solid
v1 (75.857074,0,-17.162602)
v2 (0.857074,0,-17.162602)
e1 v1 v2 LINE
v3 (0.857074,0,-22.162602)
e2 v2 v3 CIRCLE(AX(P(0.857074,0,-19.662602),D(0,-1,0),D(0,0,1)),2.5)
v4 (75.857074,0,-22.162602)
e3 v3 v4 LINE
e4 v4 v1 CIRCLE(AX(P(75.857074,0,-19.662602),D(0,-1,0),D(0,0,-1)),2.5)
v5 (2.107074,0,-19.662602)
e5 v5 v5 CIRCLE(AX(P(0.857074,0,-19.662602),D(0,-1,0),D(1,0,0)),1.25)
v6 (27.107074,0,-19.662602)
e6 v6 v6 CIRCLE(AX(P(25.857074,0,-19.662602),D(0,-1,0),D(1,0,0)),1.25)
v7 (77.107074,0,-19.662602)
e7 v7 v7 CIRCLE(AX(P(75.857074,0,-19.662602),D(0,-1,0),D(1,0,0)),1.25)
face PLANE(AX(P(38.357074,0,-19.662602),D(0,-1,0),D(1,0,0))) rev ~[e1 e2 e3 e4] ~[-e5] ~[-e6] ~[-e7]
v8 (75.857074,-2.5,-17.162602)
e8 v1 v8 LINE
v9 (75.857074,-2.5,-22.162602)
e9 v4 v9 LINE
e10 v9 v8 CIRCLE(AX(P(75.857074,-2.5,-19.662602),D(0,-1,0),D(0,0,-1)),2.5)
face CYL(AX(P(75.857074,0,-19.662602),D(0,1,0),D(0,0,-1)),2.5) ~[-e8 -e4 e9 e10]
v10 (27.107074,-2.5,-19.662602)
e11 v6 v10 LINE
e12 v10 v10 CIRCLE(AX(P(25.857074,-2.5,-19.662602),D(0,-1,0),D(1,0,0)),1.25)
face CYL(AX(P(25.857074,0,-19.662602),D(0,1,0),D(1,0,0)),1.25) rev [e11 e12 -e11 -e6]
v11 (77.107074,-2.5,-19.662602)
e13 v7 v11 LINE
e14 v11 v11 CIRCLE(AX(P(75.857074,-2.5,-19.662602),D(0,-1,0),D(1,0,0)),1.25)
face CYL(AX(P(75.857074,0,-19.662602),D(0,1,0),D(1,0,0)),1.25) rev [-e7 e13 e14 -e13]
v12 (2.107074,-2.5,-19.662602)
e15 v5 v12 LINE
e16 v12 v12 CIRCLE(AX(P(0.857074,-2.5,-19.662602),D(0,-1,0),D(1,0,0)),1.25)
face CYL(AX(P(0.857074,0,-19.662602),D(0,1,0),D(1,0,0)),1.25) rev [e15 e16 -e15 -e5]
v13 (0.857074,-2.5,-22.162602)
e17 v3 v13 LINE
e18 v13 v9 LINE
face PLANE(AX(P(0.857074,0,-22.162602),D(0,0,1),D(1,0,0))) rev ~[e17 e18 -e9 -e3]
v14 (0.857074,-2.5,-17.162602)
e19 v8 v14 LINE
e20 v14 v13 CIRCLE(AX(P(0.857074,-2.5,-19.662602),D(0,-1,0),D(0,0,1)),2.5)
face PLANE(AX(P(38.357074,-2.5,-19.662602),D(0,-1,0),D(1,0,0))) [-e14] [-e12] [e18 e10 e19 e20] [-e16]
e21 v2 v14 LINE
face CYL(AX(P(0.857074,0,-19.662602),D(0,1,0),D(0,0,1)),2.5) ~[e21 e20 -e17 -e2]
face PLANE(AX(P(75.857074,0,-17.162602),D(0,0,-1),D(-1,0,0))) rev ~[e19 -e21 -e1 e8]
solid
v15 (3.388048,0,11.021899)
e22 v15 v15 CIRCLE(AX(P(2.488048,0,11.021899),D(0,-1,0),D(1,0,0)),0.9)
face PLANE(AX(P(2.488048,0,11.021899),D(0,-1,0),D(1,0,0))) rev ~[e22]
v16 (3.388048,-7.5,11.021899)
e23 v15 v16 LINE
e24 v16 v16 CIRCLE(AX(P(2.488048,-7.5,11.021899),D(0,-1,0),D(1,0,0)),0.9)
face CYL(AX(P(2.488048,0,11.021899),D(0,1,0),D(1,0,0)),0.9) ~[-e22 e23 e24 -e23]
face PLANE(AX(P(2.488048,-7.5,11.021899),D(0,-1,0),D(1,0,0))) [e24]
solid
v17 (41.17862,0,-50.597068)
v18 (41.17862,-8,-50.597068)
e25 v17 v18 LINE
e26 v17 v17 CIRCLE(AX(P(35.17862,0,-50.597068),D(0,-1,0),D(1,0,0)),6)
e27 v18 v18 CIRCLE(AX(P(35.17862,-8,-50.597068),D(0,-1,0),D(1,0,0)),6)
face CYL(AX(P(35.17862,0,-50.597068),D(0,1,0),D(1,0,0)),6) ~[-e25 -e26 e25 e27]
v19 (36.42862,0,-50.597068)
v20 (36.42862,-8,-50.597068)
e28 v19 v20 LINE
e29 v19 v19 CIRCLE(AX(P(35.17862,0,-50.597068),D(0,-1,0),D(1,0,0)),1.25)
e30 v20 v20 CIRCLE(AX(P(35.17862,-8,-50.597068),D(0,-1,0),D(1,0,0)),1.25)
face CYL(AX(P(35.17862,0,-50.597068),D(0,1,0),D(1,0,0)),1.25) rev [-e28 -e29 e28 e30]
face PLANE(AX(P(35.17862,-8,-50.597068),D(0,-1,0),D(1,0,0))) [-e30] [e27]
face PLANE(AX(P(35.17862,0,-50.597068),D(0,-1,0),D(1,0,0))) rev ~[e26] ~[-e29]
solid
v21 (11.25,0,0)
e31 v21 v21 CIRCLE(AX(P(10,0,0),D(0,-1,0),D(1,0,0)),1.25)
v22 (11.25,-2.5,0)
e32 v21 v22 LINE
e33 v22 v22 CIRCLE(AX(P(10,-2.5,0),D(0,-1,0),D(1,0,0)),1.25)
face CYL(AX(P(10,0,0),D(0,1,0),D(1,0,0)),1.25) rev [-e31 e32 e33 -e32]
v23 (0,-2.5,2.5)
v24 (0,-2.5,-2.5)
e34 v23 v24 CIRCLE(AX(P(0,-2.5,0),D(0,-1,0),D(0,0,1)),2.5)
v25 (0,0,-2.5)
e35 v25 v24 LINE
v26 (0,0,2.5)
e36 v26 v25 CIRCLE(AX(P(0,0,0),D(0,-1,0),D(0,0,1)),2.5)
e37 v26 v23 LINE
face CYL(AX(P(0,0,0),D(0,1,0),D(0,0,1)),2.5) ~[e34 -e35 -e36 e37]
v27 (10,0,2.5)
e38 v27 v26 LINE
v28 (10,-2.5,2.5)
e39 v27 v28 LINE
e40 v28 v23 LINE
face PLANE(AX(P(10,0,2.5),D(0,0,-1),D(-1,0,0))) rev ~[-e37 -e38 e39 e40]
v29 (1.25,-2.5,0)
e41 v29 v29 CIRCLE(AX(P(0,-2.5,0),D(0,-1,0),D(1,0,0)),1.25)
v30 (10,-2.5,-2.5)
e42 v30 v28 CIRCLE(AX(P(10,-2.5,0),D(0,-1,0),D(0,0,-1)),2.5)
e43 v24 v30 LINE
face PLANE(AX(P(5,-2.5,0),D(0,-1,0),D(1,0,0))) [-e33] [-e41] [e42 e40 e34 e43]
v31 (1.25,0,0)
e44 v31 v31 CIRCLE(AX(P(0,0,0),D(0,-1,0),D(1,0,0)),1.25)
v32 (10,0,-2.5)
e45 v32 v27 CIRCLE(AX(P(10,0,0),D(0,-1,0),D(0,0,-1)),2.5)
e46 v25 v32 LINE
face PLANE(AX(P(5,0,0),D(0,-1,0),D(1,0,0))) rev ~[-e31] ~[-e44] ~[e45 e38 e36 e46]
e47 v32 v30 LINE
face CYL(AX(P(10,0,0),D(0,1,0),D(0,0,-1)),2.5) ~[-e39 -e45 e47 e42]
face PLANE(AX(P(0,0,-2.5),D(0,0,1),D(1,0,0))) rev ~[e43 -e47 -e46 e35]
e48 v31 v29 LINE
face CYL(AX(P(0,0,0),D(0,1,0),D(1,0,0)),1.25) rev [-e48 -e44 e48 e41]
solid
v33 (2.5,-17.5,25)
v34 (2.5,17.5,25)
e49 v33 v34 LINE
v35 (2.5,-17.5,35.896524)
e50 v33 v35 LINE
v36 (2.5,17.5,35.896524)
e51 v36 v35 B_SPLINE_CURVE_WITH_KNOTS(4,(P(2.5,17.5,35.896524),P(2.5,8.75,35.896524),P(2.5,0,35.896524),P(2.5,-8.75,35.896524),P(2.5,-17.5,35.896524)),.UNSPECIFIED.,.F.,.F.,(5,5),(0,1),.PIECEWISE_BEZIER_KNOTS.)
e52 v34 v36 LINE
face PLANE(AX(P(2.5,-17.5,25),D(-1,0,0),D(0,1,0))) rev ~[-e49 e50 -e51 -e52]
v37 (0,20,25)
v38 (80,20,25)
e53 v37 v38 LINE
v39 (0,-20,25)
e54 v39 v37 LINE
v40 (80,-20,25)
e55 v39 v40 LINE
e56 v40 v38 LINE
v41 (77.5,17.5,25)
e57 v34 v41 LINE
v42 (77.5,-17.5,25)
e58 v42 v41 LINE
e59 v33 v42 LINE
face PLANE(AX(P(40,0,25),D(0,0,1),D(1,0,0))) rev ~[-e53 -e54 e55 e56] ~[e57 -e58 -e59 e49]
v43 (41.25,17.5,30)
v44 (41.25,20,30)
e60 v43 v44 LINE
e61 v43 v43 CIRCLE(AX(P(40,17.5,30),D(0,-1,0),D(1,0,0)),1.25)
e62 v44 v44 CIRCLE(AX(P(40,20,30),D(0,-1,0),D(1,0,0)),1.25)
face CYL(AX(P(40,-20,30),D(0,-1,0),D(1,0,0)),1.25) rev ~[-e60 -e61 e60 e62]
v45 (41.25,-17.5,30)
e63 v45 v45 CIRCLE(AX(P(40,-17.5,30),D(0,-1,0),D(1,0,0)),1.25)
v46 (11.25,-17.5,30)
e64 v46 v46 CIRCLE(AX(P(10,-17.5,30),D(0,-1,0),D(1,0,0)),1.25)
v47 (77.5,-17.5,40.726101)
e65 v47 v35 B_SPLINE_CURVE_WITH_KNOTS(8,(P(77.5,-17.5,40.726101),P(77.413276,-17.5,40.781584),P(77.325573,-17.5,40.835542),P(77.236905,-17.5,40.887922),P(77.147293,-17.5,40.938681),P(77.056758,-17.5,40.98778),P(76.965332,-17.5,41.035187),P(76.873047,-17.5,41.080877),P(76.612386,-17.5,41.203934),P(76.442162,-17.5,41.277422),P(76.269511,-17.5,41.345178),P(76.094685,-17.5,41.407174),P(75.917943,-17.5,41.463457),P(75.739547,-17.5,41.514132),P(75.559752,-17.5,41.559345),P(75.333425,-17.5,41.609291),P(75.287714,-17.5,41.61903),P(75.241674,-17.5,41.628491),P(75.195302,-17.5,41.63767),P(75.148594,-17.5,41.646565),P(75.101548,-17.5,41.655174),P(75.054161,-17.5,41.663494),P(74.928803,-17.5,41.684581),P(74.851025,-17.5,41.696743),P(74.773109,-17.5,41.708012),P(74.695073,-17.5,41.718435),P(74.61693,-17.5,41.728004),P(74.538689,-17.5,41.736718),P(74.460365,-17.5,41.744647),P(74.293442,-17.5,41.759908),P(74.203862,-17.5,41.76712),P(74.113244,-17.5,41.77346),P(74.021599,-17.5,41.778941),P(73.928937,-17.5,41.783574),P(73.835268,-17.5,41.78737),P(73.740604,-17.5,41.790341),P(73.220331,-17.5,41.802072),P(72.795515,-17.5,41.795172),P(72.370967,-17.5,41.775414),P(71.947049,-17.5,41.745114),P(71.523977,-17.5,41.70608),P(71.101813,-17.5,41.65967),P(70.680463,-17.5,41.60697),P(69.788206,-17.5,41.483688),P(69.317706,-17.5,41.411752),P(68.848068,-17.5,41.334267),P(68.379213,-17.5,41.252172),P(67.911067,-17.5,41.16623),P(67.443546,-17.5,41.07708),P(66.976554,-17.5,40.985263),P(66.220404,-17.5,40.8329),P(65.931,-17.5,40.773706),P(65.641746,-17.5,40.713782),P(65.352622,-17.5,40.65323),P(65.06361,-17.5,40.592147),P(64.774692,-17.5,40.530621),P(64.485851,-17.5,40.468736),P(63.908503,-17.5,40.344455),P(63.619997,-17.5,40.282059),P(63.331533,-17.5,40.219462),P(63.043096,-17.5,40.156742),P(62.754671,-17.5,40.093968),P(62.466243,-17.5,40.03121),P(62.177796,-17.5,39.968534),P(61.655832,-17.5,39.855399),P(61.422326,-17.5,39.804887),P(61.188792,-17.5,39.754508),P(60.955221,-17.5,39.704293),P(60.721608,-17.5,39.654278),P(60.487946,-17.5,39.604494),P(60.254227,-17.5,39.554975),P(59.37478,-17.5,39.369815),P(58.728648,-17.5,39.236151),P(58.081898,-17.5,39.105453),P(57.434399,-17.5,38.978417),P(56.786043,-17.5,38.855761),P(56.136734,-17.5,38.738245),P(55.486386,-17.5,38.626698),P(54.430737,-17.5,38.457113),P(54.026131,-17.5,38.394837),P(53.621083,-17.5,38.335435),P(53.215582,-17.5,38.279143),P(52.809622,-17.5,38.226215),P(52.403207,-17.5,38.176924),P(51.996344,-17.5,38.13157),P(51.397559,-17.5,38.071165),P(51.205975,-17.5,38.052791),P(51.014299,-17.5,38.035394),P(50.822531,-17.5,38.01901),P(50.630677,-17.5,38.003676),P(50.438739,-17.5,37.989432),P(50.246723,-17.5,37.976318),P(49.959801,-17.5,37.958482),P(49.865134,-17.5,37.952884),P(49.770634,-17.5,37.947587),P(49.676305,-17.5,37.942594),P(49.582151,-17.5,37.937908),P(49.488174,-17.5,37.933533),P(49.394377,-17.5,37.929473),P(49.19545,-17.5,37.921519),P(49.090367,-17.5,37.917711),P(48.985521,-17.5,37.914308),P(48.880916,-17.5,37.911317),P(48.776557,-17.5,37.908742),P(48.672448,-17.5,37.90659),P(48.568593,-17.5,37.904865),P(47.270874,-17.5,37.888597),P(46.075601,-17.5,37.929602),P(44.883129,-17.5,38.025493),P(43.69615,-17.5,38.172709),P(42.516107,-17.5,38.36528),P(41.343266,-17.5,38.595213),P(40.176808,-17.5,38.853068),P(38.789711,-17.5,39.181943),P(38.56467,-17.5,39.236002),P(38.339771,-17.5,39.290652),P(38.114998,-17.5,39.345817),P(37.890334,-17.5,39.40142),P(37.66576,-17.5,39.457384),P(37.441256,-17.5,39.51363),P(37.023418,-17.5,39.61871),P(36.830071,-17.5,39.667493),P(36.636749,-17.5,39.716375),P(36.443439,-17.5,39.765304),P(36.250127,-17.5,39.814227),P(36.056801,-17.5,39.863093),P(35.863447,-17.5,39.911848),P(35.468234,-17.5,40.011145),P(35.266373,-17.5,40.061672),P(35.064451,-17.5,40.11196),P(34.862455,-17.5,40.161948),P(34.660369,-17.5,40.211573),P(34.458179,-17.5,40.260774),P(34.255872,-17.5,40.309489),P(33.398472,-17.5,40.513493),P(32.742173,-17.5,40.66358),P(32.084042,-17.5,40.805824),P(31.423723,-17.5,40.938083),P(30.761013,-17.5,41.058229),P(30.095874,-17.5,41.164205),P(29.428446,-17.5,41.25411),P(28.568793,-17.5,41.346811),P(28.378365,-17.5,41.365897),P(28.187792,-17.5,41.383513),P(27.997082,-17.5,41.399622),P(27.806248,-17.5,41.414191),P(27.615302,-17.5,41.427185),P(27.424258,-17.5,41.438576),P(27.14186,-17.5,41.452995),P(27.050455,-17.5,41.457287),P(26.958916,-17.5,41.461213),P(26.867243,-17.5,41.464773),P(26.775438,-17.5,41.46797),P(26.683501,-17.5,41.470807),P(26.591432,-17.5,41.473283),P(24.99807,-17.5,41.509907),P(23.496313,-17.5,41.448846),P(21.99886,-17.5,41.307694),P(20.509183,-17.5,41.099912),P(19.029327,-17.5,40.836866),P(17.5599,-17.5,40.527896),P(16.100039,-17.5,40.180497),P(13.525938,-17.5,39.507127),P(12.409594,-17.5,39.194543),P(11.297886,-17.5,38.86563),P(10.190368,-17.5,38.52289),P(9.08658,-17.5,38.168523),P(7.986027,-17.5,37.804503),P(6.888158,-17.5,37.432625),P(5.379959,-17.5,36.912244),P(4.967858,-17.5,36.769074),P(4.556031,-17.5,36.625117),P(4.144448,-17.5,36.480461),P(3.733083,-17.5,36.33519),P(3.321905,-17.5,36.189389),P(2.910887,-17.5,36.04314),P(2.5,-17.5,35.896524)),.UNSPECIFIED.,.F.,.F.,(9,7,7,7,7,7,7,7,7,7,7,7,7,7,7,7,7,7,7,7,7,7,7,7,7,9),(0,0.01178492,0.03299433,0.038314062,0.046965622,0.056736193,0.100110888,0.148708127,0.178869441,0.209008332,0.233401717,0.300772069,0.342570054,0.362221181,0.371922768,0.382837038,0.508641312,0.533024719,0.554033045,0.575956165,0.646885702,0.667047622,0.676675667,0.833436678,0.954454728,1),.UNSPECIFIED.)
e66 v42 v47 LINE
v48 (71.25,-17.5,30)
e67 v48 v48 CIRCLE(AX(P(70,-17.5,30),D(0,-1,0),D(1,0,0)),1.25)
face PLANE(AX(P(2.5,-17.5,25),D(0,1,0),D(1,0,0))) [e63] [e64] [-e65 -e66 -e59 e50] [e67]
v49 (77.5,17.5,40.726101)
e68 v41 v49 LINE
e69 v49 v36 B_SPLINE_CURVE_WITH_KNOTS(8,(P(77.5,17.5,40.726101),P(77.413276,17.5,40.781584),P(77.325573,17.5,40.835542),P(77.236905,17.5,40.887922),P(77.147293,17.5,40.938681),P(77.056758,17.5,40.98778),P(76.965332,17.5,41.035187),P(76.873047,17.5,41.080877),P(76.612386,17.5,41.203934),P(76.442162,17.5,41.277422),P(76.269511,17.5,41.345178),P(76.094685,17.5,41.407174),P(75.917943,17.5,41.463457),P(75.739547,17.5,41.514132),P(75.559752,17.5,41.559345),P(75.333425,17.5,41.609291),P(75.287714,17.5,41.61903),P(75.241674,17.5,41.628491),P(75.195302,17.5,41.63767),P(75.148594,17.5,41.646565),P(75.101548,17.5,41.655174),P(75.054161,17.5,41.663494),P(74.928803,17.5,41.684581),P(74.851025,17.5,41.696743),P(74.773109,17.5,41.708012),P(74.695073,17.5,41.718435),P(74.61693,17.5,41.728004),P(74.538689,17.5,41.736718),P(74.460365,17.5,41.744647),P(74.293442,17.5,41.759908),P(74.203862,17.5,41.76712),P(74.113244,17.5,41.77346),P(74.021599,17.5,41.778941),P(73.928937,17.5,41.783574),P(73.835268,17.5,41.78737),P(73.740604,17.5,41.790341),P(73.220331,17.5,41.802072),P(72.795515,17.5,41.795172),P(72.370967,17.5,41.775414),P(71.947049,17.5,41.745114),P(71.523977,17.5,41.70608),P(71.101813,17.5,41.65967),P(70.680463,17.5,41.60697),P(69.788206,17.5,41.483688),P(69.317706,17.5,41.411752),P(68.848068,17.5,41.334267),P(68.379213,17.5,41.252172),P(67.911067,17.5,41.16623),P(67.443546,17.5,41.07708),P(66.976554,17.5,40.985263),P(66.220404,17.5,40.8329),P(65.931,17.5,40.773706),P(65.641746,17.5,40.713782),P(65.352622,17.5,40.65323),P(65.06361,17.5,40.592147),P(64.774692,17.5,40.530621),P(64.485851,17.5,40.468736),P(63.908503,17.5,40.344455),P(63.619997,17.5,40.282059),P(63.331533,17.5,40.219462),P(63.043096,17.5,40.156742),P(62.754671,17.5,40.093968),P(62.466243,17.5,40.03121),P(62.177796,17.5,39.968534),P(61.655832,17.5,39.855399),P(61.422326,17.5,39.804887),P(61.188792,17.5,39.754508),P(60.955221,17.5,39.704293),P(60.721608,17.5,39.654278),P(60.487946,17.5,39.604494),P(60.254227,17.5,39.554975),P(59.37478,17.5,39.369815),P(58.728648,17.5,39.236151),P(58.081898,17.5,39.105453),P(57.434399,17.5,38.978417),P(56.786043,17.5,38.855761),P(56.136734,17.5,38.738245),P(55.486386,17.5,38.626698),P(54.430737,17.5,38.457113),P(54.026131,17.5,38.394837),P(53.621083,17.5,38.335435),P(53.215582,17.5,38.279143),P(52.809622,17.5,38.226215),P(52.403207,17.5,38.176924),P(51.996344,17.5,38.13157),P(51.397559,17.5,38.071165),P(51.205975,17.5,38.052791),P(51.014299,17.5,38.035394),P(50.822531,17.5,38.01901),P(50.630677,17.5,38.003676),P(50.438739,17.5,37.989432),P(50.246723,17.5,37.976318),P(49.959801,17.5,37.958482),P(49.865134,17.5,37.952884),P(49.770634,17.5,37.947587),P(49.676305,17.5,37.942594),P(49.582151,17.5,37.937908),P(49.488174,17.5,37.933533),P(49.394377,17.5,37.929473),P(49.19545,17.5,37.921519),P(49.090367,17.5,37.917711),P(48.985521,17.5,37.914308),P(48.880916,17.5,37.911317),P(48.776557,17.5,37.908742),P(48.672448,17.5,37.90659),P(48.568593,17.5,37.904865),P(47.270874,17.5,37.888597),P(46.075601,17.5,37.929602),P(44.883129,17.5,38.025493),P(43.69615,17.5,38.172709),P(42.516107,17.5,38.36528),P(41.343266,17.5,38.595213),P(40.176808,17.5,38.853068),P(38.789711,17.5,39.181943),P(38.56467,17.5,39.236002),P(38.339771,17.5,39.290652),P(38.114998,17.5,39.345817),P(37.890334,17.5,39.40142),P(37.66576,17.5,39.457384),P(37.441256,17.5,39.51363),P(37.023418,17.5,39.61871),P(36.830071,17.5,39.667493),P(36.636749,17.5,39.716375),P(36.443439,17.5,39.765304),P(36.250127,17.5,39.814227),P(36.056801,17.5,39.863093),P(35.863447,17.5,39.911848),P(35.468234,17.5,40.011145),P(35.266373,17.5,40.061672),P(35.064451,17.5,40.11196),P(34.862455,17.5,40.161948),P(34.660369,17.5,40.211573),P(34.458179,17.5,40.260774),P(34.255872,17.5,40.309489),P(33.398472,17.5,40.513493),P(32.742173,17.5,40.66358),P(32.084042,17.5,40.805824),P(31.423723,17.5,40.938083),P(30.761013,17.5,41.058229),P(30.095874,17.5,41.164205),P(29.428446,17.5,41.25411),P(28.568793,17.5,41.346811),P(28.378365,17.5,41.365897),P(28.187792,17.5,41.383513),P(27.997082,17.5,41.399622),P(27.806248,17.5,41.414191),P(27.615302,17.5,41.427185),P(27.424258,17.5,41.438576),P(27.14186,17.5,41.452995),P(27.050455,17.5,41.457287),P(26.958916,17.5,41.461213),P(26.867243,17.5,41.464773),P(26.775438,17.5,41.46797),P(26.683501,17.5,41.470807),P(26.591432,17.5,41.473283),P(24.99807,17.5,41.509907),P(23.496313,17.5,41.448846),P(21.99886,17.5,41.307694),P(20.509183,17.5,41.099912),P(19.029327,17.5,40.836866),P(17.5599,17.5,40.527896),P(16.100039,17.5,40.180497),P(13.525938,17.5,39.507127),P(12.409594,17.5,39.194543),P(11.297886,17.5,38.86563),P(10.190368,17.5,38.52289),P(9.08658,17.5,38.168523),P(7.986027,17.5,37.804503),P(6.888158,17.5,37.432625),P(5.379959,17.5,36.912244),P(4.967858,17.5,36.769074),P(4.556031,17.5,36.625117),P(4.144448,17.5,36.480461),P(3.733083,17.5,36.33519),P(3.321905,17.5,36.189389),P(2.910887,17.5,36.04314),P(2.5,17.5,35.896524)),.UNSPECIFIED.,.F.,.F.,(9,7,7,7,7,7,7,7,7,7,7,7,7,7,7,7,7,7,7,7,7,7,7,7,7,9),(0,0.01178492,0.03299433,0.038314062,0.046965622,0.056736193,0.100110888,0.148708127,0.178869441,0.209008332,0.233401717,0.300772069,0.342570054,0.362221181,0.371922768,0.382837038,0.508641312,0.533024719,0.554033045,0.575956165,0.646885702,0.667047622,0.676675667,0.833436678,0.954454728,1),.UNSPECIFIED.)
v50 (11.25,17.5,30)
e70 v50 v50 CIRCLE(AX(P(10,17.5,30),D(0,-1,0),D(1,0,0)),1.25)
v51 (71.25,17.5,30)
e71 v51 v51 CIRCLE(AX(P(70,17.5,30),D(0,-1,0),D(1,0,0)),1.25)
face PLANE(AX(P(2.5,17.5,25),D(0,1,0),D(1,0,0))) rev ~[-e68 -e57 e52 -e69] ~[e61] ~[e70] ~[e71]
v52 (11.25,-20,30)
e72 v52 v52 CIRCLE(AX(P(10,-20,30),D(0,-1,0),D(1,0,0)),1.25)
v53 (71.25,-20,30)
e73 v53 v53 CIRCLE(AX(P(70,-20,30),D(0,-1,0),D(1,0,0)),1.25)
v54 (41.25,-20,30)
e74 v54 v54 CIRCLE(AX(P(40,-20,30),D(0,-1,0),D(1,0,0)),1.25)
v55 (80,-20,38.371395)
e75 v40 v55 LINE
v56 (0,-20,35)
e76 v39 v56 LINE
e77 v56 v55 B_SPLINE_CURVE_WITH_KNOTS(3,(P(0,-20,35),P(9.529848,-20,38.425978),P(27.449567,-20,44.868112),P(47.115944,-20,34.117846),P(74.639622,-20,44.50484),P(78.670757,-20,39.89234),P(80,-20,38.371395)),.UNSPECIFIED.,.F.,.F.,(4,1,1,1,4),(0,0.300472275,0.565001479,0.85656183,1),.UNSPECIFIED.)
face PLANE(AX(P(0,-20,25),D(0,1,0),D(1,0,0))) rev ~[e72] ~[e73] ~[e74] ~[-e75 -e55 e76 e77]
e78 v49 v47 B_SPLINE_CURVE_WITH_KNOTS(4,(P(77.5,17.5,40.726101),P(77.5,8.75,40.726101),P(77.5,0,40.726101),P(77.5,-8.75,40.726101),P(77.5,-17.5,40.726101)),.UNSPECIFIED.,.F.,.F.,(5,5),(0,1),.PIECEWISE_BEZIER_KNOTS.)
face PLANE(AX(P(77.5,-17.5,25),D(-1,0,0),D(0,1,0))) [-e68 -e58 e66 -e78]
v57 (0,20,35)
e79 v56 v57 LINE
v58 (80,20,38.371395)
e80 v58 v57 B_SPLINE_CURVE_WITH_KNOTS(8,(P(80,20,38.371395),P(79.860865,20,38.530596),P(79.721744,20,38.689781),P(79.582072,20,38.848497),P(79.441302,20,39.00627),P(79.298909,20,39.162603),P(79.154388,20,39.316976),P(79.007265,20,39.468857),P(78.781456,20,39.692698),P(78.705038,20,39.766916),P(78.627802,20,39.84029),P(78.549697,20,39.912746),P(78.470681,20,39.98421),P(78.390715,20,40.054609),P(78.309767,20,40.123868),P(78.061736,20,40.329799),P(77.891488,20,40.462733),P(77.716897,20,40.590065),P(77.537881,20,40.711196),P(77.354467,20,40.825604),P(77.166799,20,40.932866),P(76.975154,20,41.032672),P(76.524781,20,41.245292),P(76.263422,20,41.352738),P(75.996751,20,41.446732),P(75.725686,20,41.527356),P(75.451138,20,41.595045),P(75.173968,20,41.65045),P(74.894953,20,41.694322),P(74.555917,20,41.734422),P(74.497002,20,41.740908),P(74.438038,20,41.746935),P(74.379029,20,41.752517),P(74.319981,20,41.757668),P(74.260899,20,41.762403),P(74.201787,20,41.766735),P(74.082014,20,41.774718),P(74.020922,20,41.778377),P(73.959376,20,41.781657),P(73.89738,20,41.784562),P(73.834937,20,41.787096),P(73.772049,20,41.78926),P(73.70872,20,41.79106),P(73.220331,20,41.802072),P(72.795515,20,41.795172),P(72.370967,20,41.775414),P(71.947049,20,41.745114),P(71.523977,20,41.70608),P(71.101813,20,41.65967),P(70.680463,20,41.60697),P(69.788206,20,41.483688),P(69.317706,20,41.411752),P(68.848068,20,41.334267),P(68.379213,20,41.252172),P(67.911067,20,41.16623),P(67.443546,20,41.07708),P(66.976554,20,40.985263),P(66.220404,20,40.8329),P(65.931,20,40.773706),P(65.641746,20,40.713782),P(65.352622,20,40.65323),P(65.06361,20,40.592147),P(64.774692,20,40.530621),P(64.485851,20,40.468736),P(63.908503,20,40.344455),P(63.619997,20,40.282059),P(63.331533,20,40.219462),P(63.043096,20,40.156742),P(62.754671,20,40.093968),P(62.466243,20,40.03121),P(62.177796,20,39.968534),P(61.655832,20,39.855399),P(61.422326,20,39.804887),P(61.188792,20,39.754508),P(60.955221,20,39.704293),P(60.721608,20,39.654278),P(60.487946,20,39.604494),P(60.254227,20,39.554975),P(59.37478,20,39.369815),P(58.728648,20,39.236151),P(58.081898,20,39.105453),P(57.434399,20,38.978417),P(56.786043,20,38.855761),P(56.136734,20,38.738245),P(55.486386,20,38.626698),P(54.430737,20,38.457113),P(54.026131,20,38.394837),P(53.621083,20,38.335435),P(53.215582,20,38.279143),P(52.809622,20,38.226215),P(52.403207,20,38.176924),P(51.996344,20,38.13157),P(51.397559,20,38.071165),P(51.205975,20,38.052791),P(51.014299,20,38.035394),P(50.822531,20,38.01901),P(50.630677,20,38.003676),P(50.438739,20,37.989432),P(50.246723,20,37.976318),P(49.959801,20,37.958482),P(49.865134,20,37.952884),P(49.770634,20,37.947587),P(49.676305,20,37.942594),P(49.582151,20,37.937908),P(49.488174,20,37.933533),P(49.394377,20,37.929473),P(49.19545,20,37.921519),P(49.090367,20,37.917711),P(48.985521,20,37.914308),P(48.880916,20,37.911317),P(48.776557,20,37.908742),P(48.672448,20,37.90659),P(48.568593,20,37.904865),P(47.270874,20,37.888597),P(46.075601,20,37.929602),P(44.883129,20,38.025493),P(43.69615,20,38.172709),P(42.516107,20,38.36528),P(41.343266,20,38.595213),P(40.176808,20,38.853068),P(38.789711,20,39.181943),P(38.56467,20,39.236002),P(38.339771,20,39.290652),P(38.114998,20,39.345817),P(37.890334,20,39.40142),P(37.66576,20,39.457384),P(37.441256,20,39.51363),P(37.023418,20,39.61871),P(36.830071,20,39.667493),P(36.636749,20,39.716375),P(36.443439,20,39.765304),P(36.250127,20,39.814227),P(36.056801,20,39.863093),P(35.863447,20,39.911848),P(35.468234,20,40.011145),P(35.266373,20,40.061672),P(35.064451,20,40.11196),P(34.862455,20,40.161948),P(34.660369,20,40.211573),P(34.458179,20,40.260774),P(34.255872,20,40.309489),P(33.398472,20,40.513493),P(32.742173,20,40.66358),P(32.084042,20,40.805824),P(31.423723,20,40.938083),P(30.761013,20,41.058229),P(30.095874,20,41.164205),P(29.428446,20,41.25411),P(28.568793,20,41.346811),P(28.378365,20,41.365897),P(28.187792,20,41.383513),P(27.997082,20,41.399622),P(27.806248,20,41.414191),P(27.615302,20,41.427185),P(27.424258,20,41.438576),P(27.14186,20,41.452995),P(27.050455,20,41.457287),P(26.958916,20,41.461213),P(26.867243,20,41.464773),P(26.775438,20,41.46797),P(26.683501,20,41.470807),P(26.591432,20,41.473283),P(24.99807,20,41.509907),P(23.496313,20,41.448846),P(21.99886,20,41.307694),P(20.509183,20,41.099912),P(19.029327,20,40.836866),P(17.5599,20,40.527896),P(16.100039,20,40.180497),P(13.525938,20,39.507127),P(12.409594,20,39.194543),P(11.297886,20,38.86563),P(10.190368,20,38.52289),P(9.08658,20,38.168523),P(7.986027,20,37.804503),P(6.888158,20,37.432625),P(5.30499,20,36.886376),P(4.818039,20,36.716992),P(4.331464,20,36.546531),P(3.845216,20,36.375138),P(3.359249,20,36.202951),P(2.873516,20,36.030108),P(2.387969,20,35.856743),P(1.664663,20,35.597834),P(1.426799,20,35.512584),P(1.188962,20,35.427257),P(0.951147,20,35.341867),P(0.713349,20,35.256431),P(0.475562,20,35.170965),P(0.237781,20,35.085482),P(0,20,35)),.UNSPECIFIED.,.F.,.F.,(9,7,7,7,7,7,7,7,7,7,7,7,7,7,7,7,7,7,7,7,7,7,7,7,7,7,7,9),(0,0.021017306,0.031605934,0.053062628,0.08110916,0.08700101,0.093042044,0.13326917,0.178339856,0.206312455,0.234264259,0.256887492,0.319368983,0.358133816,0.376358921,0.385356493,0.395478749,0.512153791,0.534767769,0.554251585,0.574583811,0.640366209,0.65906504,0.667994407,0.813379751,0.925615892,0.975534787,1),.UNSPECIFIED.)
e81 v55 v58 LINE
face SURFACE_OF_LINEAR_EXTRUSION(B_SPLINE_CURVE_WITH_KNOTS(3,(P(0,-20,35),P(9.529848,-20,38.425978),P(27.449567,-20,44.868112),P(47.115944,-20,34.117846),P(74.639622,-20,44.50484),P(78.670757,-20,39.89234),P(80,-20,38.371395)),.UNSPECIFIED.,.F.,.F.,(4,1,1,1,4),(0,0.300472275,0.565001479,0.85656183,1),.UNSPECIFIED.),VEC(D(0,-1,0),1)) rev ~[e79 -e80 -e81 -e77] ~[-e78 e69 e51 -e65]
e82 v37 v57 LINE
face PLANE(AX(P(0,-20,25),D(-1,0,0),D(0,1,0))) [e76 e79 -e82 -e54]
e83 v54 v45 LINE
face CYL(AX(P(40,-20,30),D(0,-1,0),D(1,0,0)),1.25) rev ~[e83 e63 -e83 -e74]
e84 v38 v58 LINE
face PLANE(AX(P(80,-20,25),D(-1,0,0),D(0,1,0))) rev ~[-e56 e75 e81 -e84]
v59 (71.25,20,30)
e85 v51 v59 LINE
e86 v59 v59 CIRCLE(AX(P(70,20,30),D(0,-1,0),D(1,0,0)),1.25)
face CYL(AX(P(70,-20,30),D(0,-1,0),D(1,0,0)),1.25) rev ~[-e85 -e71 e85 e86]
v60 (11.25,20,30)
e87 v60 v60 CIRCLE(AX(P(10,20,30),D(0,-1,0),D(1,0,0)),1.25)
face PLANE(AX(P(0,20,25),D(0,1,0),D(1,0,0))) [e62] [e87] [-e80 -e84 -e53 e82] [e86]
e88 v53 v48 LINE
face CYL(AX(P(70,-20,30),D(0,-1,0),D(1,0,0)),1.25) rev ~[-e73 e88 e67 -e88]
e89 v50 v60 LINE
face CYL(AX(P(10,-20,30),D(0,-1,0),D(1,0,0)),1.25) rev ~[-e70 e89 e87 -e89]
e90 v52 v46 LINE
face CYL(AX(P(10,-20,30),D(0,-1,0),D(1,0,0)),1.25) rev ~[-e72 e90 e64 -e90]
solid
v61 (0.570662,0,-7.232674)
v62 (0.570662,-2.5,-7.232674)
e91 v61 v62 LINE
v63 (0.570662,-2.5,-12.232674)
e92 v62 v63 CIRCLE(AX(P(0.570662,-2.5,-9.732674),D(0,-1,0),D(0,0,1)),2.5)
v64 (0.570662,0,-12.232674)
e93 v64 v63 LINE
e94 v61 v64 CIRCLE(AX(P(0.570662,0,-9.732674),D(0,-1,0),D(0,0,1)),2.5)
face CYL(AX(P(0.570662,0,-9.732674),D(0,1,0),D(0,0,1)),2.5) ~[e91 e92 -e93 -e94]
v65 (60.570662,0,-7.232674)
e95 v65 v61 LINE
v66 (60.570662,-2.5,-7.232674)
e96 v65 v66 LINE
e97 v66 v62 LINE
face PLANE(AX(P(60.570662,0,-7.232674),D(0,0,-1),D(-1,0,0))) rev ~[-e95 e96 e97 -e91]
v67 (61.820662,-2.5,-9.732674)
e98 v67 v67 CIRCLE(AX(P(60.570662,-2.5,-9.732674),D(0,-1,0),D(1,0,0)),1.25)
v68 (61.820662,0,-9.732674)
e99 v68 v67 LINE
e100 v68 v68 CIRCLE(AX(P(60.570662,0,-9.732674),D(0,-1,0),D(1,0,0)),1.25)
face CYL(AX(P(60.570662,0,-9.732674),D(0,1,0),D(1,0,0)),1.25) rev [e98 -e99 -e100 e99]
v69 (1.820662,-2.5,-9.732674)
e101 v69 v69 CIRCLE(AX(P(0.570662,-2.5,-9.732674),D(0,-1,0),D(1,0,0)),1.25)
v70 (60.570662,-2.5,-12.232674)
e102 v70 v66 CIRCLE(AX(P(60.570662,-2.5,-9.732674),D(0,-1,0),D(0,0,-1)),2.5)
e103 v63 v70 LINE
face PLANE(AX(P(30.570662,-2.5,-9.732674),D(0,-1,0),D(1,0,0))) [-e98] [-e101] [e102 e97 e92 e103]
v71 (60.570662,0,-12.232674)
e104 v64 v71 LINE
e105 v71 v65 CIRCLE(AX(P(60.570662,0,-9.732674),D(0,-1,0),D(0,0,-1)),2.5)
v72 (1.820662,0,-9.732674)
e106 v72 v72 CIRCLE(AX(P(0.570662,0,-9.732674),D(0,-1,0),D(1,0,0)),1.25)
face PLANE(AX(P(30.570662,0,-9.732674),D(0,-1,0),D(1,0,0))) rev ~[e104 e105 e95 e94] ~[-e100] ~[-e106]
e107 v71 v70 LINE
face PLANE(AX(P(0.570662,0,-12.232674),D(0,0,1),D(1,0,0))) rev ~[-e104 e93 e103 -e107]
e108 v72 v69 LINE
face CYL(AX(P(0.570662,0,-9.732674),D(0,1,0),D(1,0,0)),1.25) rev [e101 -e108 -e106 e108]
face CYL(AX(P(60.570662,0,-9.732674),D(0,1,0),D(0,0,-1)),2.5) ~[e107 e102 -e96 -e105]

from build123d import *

# Parameters (mm, degrees)
F1_R      = 1.25
F2_DEPTH  = 2.5
F3_R      = 1.25
F4_DEPTH  = 2.5
F5_R      = 1.25
F6_DEPTH  = 2.5
F8_W      = 80
F8_H      = 40
F8_W_2    = 75
F8_H_2    = 35
F9_DEPTH  = 20
F10_R     = 1.25
F11_DEPTH = 40.001
F12_R     = 0.9
F13_DEPTH = 7.5
F15_DEPTH = 40.001
F16_R     = 6
F16_R_2   = 1.25
F17_DEPTH = 8


with BuildPart() as f2:
    # F1 (on Front) → F2 (new body)
    with BuildSketch(Plane.XZ):
        with BuildLine():
            Line((10, 2.5), (0, 2.5))
            ThreePointArc((0, 2.5), (-2.5, 0), (0, -2.5))
            Line((0, -2.5), (10, -2.5))
            ThreePointArc((10, -2.5), (12.5, 0), (10, 2.5))
        make_face()
        Circle(F1_R, mode=Mode.SUBTRACT)
        with Locations((10, 0)):
            Circle(F1_R, mode=Mode.SUBTRACT)
    extrude(amount=F2_DEPTH)


with BuildPart() as f4:
    # F3 (on Front) → F4 (new body)
    with BuildSketch(Plane.XZ):
        with BuildLine():
            Line((60.5706622079, -7.232673876), (0.5706622079, -7.232673876))
            ThreePointArc((0.5706622079, -7.232673876), (-1.9293377921, -9.732673876), (0.5706622079, -12.232673876))
            Line((0.5706622079, -12.232673876), (60.5706622079, -12.232673876))
            ThreePointArc((60.5706622079, -12.232673876), (63.0706622079, -9.732673876), (60.5706622079, -7.232673876))
        make_face()
        with Locations((0.5706622079, -9.732673876)):
            Circle(F3_R, mode=Mode.SUBTRACT)
        with Locations((60.5706622079, -9.732673876)):
            Circle(F3_R, mode=Mode.SUBTRACT)
    extrude(amount=F4_DEPTH)


with BuildPart() as f6:
    # F5 (on Front) → F6 (new body)
    with BuildSketch(Plane.XZ):
        with BuildLine():
            Line((75.8570737601, -17.1626018733), (0.8570737601, -17.1626018733))
            ThreePointArc((0.8570737601, -17.1626018733), (-1.6429262399, -19.6626018733), (0.8570737601, -22.1626018733))
            Line((0.8570737601, -22.1626018733), (75.8570737601, -22.1626018733))
            ThreePointArc((75.8570737601, -22.1626018733), (78.3570737601, -19.6626018733), (75.8570737601, -17.1626018733))
        make_face()
        with Locations((0.8570737601, -19.6626018733)):
            Circle(F5_R, mode=Mode.SUBTRACT)
        with Locations((25.8570737601, -19.6626018733)):
            Circle(F5_R, mode=Mode.SUBTRACT)
        with Locations((75.8570737601, -19.6626018733)):
            Circle(F5_R, mode=Mode.SUBTRACT)
    extrude(amount=F6_DEPTH)


with BuildPart() as f9:
    # F8 (on offset) → F9 (new body)
    with BuildSketch(Plane.XY.offset(25)):
        with Locations((40, 0)):
            Rectangle(F8_W, F8_H)
        with Locations((40, 0)):
            Rectangle(F8_W_2, F8_H_2, mode=Mode.SUBTRACT)
    extrude(amount=F9_DEPTH)

    # F10 (on face) → F11 (cut, through all)
    with BuildSketch(Plane.XZ.offset(20)):
        with Locations((10, 30)):
            Circle(F10_R)
        with Locations((70, 30)):
            Circle(F10_R)
        with Locations((40, 30)):
            Circle(F10_R)
    extrude(amount=-F11_DEPTH, mode=Mode.SUBTRACT)

    # F14 (on face) → F15 (cut, through all)
    with BuildSketch(Plane.XZ.offset(20)):
        with BuildLine():
            Line((-10.1319709793, 49.101550132), (0, 35))
            add(Edge.make_bspline(
                [(0, 35), (9.529848485, 38.4259781723), (27.4495666781, 44.8681124286), (47.1159441406, 34.1178456935), (74.6396223756, 44.5048404906), (78.6707572882, 39.8923398991), (80, 38.3713953197)],
                knots=[0, 0, 0, 0, 0.300472275, 0.5650014794, 0.8565618304, 1, 1, 1, 1], degree=3))
            Line((80, 38.3713953197), (95.8632975817, 42.5701513886))
            Line((95.8632975817, 42.5701513886), (68.1515038013, 61.1379854381))
            Line((68.1515038013, 61.1379854381), (-10.1319709793, 49.101550132))
        make_face()
    extrude(amount=-F15_DEPTH, mode=Mode.SUBTRACT)


with BuildPart() as f13:
    # F12 (on Front) → F13 (new body)
    with BuildSketch(Plane.XZ):
        with Locations((2.488047583, 11.0218990594)):
            Circle(F12_R)
    extrude(amount=F13_DEPTH)


with BuildPart() as f17:
    # F16 (on Front) → F17 (new body)
    with BuildSketch(Plane.XZ):
        with Locations((35.1786203682, -50.5970679224)):
            Circle(F16_R)
        with Locations((35.1786203682, -50.5970679224)):
            Circle(F16_R_2, mode=Mode.SUBTRACT)
    extrude(amount=F17_DEPTH)


solid = Compound([f2.part, f4.part, f6.part, f9.part, f13.part, f17.part])
